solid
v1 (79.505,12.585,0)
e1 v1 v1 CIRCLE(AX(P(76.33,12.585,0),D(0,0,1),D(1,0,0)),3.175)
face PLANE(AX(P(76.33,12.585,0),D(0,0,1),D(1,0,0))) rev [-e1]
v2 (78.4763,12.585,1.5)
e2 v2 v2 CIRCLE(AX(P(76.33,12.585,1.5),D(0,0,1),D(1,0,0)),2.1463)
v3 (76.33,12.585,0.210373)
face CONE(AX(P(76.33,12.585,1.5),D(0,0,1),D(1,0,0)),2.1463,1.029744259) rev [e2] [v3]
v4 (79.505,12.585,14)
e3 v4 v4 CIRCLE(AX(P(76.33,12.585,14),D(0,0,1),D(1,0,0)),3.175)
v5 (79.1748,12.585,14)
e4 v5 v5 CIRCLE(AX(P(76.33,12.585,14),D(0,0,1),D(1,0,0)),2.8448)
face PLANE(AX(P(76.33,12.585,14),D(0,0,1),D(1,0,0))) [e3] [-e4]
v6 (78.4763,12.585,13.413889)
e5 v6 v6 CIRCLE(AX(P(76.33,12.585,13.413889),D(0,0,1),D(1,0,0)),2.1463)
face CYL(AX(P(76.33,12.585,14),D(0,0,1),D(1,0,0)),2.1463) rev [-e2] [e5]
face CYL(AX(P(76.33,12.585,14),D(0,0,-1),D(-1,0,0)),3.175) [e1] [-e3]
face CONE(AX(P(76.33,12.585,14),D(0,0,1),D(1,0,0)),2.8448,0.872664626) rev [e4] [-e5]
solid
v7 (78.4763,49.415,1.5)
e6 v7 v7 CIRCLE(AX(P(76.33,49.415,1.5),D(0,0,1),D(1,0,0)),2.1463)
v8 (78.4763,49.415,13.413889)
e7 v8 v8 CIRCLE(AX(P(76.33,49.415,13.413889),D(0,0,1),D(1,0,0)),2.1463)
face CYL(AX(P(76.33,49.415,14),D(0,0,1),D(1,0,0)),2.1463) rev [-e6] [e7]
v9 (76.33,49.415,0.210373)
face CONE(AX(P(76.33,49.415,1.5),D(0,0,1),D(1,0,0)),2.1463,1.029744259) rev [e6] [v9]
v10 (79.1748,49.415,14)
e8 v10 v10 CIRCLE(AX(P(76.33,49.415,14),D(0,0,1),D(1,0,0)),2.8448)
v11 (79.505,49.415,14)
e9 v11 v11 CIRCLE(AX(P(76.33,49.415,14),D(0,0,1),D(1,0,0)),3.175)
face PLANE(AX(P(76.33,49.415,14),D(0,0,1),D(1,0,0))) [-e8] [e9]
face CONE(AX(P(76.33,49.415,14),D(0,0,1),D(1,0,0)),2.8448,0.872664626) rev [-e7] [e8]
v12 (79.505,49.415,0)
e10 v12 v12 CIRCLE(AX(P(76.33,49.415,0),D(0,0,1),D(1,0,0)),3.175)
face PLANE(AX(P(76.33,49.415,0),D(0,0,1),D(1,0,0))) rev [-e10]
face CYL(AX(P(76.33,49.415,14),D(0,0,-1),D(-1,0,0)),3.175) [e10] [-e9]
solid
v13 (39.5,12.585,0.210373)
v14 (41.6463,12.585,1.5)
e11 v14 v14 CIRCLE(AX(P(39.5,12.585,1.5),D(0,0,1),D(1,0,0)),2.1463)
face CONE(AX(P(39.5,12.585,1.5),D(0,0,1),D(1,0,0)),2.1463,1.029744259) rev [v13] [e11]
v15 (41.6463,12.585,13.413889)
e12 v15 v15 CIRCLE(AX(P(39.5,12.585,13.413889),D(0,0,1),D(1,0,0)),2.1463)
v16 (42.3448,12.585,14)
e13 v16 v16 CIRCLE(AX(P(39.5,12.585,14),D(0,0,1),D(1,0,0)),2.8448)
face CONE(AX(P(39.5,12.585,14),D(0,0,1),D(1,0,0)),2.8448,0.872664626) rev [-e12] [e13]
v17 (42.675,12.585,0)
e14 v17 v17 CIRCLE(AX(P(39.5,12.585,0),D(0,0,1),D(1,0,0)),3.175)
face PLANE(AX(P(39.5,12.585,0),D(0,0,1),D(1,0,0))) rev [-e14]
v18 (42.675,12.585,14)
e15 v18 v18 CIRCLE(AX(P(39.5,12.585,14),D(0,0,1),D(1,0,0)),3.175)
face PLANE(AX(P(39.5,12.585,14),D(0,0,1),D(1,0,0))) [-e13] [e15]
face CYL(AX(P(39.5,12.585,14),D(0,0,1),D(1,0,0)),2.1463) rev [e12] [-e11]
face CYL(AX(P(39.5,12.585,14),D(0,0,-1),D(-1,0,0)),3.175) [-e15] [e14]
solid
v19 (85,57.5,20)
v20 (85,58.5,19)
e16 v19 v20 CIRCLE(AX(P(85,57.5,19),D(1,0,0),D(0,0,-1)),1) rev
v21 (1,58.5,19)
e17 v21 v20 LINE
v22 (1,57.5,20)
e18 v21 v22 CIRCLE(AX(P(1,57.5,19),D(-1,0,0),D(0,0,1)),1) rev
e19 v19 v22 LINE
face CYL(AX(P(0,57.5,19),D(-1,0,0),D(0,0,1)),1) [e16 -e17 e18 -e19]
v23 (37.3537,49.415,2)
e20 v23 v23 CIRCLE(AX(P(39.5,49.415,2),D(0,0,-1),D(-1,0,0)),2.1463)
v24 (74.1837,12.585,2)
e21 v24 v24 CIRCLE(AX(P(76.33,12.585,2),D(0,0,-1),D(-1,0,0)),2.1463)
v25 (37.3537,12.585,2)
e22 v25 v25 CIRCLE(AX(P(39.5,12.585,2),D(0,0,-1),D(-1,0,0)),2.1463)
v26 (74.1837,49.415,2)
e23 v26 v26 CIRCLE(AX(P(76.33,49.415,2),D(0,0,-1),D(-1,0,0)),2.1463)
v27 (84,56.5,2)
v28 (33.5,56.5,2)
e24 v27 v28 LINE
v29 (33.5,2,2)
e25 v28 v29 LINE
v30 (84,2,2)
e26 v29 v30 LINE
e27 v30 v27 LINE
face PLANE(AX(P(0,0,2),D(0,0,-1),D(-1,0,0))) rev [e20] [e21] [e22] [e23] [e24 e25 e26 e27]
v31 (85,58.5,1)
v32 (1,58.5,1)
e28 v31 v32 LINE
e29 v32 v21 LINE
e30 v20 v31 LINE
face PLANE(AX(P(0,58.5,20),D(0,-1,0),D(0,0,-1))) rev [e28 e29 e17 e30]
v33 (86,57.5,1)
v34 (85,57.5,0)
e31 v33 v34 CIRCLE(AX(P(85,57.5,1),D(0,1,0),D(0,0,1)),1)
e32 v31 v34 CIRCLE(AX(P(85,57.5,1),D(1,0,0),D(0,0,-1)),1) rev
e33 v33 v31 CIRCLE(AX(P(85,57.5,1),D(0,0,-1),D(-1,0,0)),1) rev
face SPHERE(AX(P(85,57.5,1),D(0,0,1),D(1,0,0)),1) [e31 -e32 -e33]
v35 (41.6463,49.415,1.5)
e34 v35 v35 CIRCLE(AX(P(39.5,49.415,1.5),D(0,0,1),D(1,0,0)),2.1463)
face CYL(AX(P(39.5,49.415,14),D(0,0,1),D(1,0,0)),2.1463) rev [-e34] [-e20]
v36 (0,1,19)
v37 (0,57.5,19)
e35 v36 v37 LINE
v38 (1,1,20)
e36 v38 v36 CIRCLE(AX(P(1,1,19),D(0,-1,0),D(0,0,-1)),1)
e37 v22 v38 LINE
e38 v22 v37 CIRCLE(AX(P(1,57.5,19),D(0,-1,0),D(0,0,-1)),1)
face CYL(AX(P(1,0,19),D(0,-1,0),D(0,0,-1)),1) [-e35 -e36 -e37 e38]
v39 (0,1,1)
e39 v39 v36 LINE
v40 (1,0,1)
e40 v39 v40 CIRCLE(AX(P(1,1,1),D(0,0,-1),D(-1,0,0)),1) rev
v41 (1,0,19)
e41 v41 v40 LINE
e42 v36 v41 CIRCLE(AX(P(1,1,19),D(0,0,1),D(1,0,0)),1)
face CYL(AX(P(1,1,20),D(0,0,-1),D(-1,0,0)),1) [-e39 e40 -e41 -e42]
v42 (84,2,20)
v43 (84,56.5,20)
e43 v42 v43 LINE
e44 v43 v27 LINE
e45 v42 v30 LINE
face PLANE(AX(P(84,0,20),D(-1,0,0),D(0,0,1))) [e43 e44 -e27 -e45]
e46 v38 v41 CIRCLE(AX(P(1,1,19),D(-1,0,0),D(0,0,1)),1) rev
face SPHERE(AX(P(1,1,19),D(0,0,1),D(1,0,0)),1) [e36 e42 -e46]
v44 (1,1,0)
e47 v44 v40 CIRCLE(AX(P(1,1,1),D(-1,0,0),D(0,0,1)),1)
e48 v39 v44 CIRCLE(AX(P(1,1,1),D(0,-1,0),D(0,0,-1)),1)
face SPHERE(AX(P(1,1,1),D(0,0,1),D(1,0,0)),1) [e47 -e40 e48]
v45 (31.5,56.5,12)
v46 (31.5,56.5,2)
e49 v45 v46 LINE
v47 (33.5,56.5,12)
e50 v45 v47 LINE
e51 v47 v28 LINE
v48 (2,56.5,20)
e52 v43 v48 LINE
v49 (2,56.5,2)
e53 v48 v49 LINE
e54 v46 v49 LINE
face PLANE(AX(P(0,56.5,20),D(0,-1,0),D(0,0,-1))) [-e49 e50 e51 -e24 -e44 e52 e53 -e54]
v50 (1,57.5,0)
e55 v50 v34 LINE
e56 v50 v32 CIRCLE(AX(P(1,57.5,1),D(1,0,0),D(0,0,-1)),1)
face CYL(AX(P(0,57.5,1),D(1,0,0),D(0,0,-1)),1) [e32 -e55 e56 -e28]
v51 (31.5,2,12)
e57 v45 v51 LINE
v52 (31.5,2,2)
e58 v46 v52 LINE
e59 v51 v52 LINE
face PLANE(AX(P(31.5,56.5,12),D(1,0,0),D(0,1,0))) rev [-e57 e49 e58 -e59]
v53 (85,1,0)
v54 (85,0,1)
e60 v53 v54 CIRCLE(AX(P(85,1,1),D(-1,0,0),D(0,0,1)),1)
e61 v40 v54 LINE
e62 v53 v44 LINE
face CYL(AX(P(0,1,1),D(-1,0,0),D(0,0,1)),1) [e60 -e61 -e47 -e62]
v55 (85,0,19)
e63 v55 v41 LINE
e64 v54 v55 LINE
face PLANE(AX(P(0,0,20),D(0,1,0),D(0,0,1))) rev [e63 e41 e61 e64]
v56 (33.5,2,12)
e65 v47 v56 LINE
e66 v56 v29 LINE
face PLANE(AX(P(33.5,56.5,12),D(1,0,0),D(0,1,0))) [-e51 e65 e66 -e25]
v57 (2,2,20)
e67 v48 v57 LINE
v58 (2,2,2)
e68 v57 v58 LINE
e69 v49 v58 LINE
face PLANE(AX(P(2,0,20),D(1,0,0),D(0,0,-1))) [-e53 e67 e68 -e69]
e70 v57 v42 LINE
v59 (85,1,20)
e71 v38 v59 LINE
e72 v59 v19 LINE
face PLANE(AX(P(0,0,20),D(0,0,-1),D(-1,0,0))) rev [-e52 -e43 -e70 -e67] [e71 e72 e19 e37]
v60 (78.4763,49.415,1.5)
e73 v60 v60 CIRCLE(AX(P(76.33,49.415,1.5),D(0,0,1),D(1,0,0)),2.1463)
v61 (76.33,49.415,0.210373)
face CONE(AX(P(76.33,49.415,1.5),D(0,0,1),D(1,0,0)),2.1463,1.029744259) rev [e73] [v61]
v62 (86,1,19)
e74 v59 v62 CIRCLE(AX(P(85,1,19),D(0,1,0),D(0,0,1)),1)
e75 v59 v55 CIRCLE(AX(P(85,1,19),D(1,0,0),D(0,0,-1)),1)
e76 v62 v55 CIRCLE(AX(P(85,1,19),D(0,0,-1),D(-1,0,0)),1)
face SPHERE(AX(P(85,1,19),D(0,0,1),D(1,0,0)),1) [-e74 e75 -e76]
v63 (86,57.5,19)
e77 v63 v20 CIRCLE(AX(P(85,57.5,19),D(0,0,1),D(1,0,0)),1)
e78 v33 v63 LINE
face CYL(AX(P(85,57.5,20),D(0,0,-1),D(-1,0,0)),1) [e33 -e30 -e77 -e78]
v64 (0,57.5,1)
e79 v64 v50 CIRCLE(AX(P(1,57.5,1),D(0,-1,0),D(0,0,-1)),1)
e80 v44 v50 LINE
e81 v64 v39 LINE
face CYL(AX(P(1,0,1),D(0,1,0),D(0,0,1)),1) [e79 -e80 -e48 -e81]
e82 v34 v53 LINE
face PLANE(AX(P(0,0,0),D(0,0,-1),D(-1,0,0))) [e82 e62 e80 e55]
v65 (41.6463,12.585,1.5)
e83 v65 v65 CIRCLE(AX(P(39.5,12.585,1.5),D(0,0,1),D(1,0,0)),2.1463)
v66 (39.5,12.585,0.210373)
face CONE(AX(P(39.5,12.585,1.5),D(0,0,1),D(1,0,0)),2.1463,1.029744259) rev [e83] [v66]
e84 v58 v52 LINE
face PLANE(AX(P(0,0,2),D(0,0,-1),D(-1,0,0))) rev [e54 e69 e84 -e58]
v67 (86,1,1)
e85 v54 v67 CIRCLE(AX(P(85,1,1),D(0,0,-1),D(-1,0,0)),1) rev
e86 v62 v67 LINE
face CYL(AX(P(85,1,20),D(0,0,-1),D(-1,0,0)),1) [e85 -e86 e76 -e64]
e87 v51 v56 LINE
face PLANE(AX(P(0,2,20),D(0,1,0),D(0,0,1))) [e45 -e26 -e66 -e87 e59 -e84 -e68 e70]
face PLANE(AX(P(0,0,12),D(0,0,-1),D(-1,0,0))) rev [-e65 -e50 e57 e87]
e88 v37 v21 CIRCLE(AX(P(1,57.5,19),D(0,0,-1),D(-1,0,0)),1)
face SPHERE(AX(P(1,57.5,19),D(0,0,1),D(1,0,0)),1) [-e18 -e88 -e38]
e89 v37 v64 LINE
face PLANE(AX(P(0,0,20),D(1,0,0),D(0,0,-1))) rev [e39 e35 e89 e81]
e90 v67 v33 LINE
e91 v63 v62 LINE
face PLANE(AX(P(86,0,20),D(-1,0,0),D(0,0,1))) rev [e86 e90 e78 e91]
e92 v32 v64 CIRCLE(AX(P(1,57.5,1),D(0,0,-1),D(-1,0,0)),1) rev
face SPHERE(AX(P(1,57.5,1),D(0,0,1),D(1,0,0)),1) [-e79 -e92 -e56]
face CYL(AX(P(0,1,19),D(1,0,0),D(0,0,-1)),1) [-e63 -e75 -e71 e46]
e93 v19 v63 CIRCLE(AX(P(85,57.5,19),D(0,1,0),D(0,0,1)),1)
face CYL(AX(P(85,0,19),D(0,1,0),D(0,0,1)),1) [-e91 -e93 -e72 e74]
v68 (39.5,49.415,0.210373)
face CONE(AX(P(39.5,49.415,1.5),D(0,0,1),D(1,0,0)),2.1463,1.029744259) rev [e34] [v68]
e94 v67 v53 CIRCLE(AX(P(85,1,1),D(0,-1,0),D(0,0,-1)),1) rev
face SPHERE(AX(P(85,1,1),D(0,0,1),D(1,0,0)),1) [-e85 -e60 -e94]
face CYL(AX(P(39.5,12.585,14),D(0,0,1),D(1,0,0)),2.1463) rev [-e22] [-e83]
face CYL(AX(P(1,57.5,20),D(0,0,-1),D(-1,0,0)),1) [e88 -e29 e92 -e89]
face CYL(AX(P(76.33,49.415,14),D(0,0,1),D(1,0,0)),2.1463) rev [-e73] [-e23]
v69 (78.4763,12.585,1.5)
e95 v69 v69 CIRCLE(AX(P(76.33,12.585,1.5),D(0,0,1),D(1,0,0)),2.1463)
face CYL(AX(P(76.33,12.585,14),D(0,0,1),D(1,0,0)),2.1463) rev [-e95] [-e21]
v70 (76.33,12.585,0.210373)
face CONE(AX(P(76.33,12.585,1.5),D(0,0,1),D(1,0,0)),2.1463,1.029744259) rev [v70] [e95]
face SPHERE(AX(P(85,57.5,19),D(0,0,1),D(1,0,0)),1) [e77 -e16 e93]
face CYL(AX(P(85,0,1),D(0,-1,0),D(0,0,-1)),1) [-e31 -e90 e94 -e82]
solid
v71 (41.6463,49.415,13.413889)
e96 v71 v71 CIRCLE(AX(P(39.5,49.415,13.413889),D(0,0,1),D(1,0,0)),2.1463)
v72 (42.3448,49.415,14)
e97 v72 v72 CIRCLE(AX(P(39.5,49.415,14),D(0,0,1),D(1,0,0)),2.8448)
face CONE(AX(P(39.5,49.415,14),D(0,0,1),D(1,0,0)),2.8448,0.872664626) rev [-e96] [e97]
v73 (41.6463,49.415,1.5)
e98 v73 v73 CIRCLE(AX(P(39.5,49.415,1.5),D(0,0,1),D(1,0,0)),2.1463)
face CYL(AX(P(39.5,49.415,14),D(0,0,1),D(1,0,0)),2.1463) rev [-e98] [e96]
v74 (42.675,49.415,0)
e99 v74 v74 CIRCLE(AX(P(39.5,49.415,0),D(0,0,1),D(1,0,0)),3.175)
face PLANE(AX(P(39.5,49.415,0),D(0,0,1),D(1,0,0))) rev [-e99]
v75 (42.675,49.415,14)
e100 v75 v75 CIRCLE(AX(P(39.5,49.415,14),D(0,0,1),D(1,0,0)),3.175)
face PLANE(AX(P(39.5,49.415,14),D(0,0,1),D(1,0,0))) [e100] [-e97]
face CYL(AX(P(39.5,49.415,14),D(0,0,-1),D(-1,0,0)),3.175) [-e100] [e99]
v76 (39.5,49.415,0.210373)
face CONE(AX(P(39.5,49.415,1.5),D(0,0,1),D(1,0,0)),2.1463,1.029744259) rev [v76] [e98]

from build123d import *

# Parameters (mm, degrees)
SKETCH1_W                           = 86
SKETCH1_H                           = 58.5
BOSS_EXTRUDE1_DEPTH                 = 20
SHELL1_T                            = -2
SKETCH4_W                           = 2
SKETCH4_H                           = 54.5
BOSS_EXTRUDE2_DEPTH                 = 10
FILLET2_R                           = 1
FILLET3_R                           = 1
SKETCH22_R                          = 3.175
BOSS_EXTRUDE10_DEPTH                = 14
BOSS_EXTRUDE10_2_DEPTH              = 14
BOSS_EXTRUDE10_3_DEPTH              = 14
BOSS_EXTRUDE10_4_DEPTH              = 14
F_4_0_209_DIAMETER_HOLE3_AT_2_COUNT = 2
F_4_0_209_DIAMETER_HOLE3_AT_2_PITCH = 36.83
F_4_0_209_DIAMETER_HOLE3_AT_3_COUNT = 2
F_4_0_209_DIAMETER_HOLE3_AT_3_PITCH = 52.085485502
F_4_0_209_DIAMETER_HOLE3_AT_4_COUNT = 2
F_4_0_209_DIAMETER_HOLE3_AT_4_PITCH = 36.83


with BuildPart() as part:
    # Sketch1 → Boss-Extrude1 (new body)
    with BuildSketch(Plane.XY):
        with Locations((43, 29.25)):
            Rectangle(SKETCH1_W, SKETCH1_H)
    extrude(amount=BOSS_EXTRUDE1_DEPTH)

    # Shell1
    shell1_openings = [part.faces().sort_by_distance(p)[0] for p in [
        (43, 29.25, 20),
    ]]
    offset(amount=SHELL1_T, openings=shell1_openings, kind=Kind.INTERSECTION)

    # Sketch4 → Boss-Extrude2 (add)
    with BuildSketch(Plane.XY.offset(2)):
        with Locations((32.5, 29.25)):
            Rectangle(SKETCH4_W, SKETCH4_H)
    extrude(amount=BOSS_EXTRUDE2_DEPTH)

    # Fillet2
    fillet2_edges = [part.edges().sort_by_distance(p)[0] for p in [
        (86, 29.25, 20),
        (43, 58.5, 20),
        (43, 58.5, 0),
        (86, 29.25, 0),
        (0, 58.5, 10),
        (86, 58.5, 10),
        (86, 0, 10),
    ]]
    fillet(fillet2_edges, radius=FILLET2_R)

    # Fillet3
    # the kernel refuses this fillet: 1 mm, written as the material it takes off along each edge
    with BuildSketch(Plane(origin=(85, 1, 1), x_dir=(0, 0, -1), z_dir=(0, -1, 0))) as fillet3_piece_1_section:
        Polygon((0, 0), (FILLET3_R, 0), (FILLET3_R, FILLET3_R), (0, FILLET3_R), align=None)
    fillet3_piece_1 = extrude(amount=FILLET3_R, mode=Mode.PRIVATE)
    fillet3_piece_1 = fillet3_piece_1 - Plane(origin=(85, 1, 1), x_dir=(-0.7071067811865475, 0, 0.7071067811865475), z_dir=(0, -1, 0)) * Sphere(FILLET3_R, mode=Mode.PRIVATE)
    add(fillet3_piece_1, mode=Mode.SUBTRACT)
    with BuildSketch(Plane(origin=(85, 1, 19), x_dir=(0, 0, 1), z_dir=(0, -1, 0))) as fillet3_piece_2_section:
        Polygon((0, 0), (FILLET3_R, 0), (FILLET3_R, -FILLET3_R), (0, -FILLET3_R), align=None)
    fillet3_piece_2 = extrude(amount=FILLET3_R, mode=Mode.PRIVATE)
    fillet3_piece_2 = fillet3_piece_2 - Plane(origin=(85, 1, 19), x_dir=(-0.7071067811865475, 0, -0.7071067811865475), z_dir=(0, -1, 0)) * Sphere(FILLET3_R, mode=Mode.PRIVATE)
    add(fillet3_piece_2, mode=Mode.SUBTRACT)
    with BuildSketch(Plane(origin=(1, 57.5, 1), x_dir=(-1, 0, 0), z_dir=(0, 0, -1))) as fillet3_piece_3_section:
        Polygon((0, 0), (FILLET3_R, 0), (FILLET3_R, FILLET3_R), (0, FILLET3_R), align=None)
    fillet3_piece_3 = extrude(amount=FILLET3_R, mode=Mode.PRIVATE)
    fillet3_piece_3 = fillet3_piece_3 - Plane(origin=(1, 57.5, 1), x_dir=(0.7071067811865475, -0.7071067811865475, 0), z_dir=(0, 0, -1)) * Sphere(FILLET3_R, mode=Mode.PRIVATE)
    add(fillet3_piece_3, mode=Mode.SUBTRACT)
    with BuildSketch(Plane(origin=(1, 57.5, 19), x_dir=(0, 0, 1), z_dir=(-1, 0, 0))) as fillet3_piece_4_section:
        Polygon((0, 0), (FILLET3_R, 0), (FILLET3_R, FILLET3_R), (0, FILLET3_R), align=None)
    fillet3_piece_4 = extrude(amount=FILLET3_R, mode=Mode.PRIVATE)
    fillet3_piece_4 = fillet3_piece_4 - Plane(origin=(1, 57.5, 19), x_dir=(0, -0.7071067811865475, -0.7071067811865475), z_dir=(-1, 0, 0)) * Sphere(FILLET3_R, mode=Mode.PRIVATE)
    add(fillet3_piece_4, mode=Mode.SUBTRACT)
    with BuildSketch(Plane(origin=(1, 1, 19), x_dir=(-1, 0, 0), z_dir=(0, -1, 0))) as fillet3_piece_5_section:
        Polygon((0, 0), (FILLET3_R, 0), (FILLET3_R, -FILLET3_R), (0, -FILLET3_R), align=None)
    fillet3_piece_5 = extrude(amount=FILLET3_R, mode=Mode.PRIVATE)
    fillet3_piece_5 = fillet3_piece_5 - Plane(origin=(1, 1, 19), x_dir=(0.7071067811865475, 0, -0.7071067811865475), z_dir=(0, -1, 0)) * Sphere(FILLET3_R, mode=Mode.PRIVATE)
    add(fillet3_piece_5, mode=Mode.SUBTRACT)
    with BuildSketch(Plane(origin=(1, 1, 1), x_dir=(0, 0, -1), z_dir=(0, -1, 0))) as fillet3_piece_6_section:
        Polygon((0, 0), (FILLET3_R, 0), (FILLET3_R, -FILLET3_R), (0, -FILLET3_R), align=None)
    fillet3_piece_6 = extrude(amount=FILLET3_R, mode=Mode.PRIVATE)
    fillet3_piece_6 = fillet3_piece_6 - Plane(origin=(1, 1, 1), x_dir=(0.7071067811865475, 0, 0.7071067811865475), z_dir=(0, -1, 0)) * Sphere(FILLET3_R, mode=Mode.PRIVATE)
    add(fillet3_piece_6, mode=Mode.SUBTRACT)
    with BuildSketch(Plane(origin=(0, 57.5, 20), x_dir=(0, 0, -1), z_dir=(0, -1, 0)), Plane(origin=(0, 57.5, 0), x_dir=(1, 0, 0), z_dir=(0, -1, 0))) as fillet3_piece_7:
        with BuildLine():
            CenterArc((FILLET3_R, FILLET3_R), FILLET3_R, 180, 90)
            Line((0, FILLET3_R), (0, 0))
            Line((0, 0), (FILLET3_R, 0))
        make_face()
    extrude(amount=56.5, mode=Mode.SUBTRACT)
    with BuildSketch(Plane(origin=(1, 0, 0), x_dir=(0, 0, 1), z_dir=(1, 0, 0))) as fillet3_piece_8:
        with BuildLine():
            CenterArc((FILLET3_R, -FILLET3_R), FILLET3_R, 90, 90)
            Line((0, -FILLET3_R), (0, 0))
            Line((0, 0), (FILLET3_R, 0))
        make_face()
    extrude(amount=84, mode=Mode.SUBTRACT)
    with BuildSketch(Plane(origin=(1, 0, 20), x_dir=(0, 0, -1), z_dir=(1, 0, 0))) as fillet3_piece_9:
        with BuildLine():
            CenterArc((FILLET3_R, FILLET3_R), FILLET3_R, 180, 90)
            Line((0, FILLET3_R), (0, 0))
            Line((0, 0), (FILLET3_R, 0))
        make_face()
    extrude(amount=84, mode=Mode.SUBTRACT)
    with BuildSketch(Plane(origin=(0, 0, 1), x_dir=(1, 0, 0), z_dir=(0, 0, 1))) as fillet3_piece_10:
        with BuildLine():
            CenterArc((FILLET3_R, FILLET3_R), FILLET3_R, 180, 90)
            Line((0, FILLET3_R), (0, 0))
            Line((0, 0), (FILLET3_R, 0))
        make_face()
    extrude(amount=18, mode=Mode.SUBTRACT)


with BuildPart() as body_2:
    # Sketch22 → Boss-Extrude10 (new body)
    with BuildSketch(Plane.XY):
        with Locations((39.5, 49.415)):
            Circle(SKETCH22_R)
    extrude(amount=BOSS_EXTRUDE10_DEPTH)


with BuildPart() as body_3:
    # Sketch22 → Boss-Extrude10 2 (new body)
    with BuildSketch(Plane.XY):
        with Locations((76.33, 49.415)):
            Circle(SKETCH22_R)
    extrude(amount=BOSS_EXTRUDE10_2_DEPTH)


with BuildPart() as body_4:
    # Sketch22 → Boss-Extrude10 3 (new body)
    with BuildSketch(Plane.XY):
        with Locations((39.5, 12.585)):
            Circle(SKETCH22_R)
    extrude(amount=BOSS_EXTRUDE10_3_DEPTH)


with BuildPart() as body_5:
    # Sketch22 → Boss-Extrude10 4 (new body)
    with BuildSketch(Plane.XY):
        with Locations((76.33, 12.585)):
            Circle(SKETCH22_R)
    extrude(amount=BOSS_EXTRUDE10_4_DEPTH)


with BuildPart() as f_4_0_209_diameter_hole3_tool:
    # Sketch28 → #4 (0.209) Diameter Hole3 (revolve)
    with BuildSketch(Plane(origin=(39.5, 49.415, 14), x_dir=(0, -1, 0), z_dir=(1, 0, 0))):
        Polygon((0, 0), (0, 13.789627147), (2.1463, 12.5), (2.1463, 0.586111092), (2.8448, 0), align=None)
    f_4_0_209_diameter_hole3 = revolve(axis=Axis((39.5, 49.415, 20.35), (0, 0, -1)))


with BuildPart() as part_1:
    add(part.part)

    # #4 (0.209) Diameter Hole3: cut by f_4_0_209_diameter_hole3_tool
    add(f_4_0_209_diameter_hole3_tool.part, mode=Mode.SUBTRACT)


with BuildPart() as body_2_1:
    add(body_2.part)

    # #4 (0.209) Diameter Hole3: cut by f_4_0_209_diameter_hole3_tool
    add(f_4_0_209_diameter_hole3_tool.part, mode=Mode.SUBTRACT)


with BuildPart() as f_4_0_209_diameter_hole3_at_2_tool:
    # #4 (0.209) Diameter Hole3 at 2: #4 (0.209) Diameter Hole3 ×2
    with Locations(*[(0, -i * F_4_0_209_DIAMETER_HOLE3_AT_2_PITCH, 0) for i in range(1, F_4_0_209_DIAMETER_HOLE3_AT_2_COUNT)]):
        add(f_4_0_209_diameter_hole3)


with BuildPart() as part_2:
    add(part_1.part)

    # #4 (0.209) Diameter Hole3 at 2: cut by f_4_0_209_diameter_hole3_at_2_tool
    add(f_4_0_209_diameter_hole3_at_2_tool.part, mode=Mode.SUBTRACT)


with BuildPart() as body_4_1:
    add(body_4.part)

    # #4 (0.209) Diameter Hole3 at 2: cut by f_4_0_209_diameter_hole3_at_2_tool
    add(f_4_0_209_diameter_hole3_at_2_tool.part, mode=Mode.SUBTRACT)


with BuildPart() as f_4_0_209_diameter_hole3_at_3_tool:
    # #4 (0.209) Diameter Hole3 at 3: #4 (0.209) Diameter Hole3 ×2
    with Locations(*[Vector(0.7071067811865478, -0.7071067811865474, 0) * (i * F_4_0_209_DIAMETER_HOLE3_AT_3_PITCH) for i in range(1, F_4_0_209_DIAMETER_HOLE3_AT_3_COUNT)]):
        add(f_4_0_209_diameter_hole3)


with BuildPart() as part_3:
    add(part_2.part)

    # #4 (0.209) Diameter Hole3 at 3: cut by f_4_0_209_diameter_hole3_at_3_tool
    add(f_4_0_209_diameter_hole3_at_3_tool.part, mode=Mode.SUBTRACT)


with BuildPart() as body_5_1:
    add(body_5.part)

    # #4 (0.209) Diameter Hole3 at 3: cut by f_4_0_209_diameter_hole3_at_3_tool
    add(f_4_0_209_diameter_hole3_at_3_tool.part, mode=Mode.SUBTRACT)


with BuildPart() as f_4_0_209_diameter_hole3_at_4_tool:
    # #4 (0.209) Diameter Hole3 at 4: #4 (0.209) Diameter Hole3 ×2
    with Locations(*[(i * F_4_0_209_DIAMETER_HOLE3_AT_4_PITCH, 0, 0) for i in range(1, F_4_0_209_DIAMETER_HOLE3_AT_4_COUNT)]):
        add(f_4_0_209_diameter_hole3)


with BuildPart() as part_4:
    add(part_3.part)

    # #4 (0.209) Diameter Hole3 at 4: cut by f_4_0_209_diameter_hole3_at_4_tool
    add(f_4_0_209_diameter_hole3_at_4_tool.part, mode=Mode.SUBTRACT)


with BuildPart() as body_3_1:
    add(body_3.part)

    # #4 (0.209) Diameter Hole3 at 4: cut by f_4_0_209_diameter_hole3_at_4_tool
    add(f_4_0_209_diameter_hole3_at_4_tool.part, mode=Mode.SUBTRACT)


solid = Compound([body_2_1.part, body_4_1.part, body_5_1.part, part_4.part, body_3_1.part])
